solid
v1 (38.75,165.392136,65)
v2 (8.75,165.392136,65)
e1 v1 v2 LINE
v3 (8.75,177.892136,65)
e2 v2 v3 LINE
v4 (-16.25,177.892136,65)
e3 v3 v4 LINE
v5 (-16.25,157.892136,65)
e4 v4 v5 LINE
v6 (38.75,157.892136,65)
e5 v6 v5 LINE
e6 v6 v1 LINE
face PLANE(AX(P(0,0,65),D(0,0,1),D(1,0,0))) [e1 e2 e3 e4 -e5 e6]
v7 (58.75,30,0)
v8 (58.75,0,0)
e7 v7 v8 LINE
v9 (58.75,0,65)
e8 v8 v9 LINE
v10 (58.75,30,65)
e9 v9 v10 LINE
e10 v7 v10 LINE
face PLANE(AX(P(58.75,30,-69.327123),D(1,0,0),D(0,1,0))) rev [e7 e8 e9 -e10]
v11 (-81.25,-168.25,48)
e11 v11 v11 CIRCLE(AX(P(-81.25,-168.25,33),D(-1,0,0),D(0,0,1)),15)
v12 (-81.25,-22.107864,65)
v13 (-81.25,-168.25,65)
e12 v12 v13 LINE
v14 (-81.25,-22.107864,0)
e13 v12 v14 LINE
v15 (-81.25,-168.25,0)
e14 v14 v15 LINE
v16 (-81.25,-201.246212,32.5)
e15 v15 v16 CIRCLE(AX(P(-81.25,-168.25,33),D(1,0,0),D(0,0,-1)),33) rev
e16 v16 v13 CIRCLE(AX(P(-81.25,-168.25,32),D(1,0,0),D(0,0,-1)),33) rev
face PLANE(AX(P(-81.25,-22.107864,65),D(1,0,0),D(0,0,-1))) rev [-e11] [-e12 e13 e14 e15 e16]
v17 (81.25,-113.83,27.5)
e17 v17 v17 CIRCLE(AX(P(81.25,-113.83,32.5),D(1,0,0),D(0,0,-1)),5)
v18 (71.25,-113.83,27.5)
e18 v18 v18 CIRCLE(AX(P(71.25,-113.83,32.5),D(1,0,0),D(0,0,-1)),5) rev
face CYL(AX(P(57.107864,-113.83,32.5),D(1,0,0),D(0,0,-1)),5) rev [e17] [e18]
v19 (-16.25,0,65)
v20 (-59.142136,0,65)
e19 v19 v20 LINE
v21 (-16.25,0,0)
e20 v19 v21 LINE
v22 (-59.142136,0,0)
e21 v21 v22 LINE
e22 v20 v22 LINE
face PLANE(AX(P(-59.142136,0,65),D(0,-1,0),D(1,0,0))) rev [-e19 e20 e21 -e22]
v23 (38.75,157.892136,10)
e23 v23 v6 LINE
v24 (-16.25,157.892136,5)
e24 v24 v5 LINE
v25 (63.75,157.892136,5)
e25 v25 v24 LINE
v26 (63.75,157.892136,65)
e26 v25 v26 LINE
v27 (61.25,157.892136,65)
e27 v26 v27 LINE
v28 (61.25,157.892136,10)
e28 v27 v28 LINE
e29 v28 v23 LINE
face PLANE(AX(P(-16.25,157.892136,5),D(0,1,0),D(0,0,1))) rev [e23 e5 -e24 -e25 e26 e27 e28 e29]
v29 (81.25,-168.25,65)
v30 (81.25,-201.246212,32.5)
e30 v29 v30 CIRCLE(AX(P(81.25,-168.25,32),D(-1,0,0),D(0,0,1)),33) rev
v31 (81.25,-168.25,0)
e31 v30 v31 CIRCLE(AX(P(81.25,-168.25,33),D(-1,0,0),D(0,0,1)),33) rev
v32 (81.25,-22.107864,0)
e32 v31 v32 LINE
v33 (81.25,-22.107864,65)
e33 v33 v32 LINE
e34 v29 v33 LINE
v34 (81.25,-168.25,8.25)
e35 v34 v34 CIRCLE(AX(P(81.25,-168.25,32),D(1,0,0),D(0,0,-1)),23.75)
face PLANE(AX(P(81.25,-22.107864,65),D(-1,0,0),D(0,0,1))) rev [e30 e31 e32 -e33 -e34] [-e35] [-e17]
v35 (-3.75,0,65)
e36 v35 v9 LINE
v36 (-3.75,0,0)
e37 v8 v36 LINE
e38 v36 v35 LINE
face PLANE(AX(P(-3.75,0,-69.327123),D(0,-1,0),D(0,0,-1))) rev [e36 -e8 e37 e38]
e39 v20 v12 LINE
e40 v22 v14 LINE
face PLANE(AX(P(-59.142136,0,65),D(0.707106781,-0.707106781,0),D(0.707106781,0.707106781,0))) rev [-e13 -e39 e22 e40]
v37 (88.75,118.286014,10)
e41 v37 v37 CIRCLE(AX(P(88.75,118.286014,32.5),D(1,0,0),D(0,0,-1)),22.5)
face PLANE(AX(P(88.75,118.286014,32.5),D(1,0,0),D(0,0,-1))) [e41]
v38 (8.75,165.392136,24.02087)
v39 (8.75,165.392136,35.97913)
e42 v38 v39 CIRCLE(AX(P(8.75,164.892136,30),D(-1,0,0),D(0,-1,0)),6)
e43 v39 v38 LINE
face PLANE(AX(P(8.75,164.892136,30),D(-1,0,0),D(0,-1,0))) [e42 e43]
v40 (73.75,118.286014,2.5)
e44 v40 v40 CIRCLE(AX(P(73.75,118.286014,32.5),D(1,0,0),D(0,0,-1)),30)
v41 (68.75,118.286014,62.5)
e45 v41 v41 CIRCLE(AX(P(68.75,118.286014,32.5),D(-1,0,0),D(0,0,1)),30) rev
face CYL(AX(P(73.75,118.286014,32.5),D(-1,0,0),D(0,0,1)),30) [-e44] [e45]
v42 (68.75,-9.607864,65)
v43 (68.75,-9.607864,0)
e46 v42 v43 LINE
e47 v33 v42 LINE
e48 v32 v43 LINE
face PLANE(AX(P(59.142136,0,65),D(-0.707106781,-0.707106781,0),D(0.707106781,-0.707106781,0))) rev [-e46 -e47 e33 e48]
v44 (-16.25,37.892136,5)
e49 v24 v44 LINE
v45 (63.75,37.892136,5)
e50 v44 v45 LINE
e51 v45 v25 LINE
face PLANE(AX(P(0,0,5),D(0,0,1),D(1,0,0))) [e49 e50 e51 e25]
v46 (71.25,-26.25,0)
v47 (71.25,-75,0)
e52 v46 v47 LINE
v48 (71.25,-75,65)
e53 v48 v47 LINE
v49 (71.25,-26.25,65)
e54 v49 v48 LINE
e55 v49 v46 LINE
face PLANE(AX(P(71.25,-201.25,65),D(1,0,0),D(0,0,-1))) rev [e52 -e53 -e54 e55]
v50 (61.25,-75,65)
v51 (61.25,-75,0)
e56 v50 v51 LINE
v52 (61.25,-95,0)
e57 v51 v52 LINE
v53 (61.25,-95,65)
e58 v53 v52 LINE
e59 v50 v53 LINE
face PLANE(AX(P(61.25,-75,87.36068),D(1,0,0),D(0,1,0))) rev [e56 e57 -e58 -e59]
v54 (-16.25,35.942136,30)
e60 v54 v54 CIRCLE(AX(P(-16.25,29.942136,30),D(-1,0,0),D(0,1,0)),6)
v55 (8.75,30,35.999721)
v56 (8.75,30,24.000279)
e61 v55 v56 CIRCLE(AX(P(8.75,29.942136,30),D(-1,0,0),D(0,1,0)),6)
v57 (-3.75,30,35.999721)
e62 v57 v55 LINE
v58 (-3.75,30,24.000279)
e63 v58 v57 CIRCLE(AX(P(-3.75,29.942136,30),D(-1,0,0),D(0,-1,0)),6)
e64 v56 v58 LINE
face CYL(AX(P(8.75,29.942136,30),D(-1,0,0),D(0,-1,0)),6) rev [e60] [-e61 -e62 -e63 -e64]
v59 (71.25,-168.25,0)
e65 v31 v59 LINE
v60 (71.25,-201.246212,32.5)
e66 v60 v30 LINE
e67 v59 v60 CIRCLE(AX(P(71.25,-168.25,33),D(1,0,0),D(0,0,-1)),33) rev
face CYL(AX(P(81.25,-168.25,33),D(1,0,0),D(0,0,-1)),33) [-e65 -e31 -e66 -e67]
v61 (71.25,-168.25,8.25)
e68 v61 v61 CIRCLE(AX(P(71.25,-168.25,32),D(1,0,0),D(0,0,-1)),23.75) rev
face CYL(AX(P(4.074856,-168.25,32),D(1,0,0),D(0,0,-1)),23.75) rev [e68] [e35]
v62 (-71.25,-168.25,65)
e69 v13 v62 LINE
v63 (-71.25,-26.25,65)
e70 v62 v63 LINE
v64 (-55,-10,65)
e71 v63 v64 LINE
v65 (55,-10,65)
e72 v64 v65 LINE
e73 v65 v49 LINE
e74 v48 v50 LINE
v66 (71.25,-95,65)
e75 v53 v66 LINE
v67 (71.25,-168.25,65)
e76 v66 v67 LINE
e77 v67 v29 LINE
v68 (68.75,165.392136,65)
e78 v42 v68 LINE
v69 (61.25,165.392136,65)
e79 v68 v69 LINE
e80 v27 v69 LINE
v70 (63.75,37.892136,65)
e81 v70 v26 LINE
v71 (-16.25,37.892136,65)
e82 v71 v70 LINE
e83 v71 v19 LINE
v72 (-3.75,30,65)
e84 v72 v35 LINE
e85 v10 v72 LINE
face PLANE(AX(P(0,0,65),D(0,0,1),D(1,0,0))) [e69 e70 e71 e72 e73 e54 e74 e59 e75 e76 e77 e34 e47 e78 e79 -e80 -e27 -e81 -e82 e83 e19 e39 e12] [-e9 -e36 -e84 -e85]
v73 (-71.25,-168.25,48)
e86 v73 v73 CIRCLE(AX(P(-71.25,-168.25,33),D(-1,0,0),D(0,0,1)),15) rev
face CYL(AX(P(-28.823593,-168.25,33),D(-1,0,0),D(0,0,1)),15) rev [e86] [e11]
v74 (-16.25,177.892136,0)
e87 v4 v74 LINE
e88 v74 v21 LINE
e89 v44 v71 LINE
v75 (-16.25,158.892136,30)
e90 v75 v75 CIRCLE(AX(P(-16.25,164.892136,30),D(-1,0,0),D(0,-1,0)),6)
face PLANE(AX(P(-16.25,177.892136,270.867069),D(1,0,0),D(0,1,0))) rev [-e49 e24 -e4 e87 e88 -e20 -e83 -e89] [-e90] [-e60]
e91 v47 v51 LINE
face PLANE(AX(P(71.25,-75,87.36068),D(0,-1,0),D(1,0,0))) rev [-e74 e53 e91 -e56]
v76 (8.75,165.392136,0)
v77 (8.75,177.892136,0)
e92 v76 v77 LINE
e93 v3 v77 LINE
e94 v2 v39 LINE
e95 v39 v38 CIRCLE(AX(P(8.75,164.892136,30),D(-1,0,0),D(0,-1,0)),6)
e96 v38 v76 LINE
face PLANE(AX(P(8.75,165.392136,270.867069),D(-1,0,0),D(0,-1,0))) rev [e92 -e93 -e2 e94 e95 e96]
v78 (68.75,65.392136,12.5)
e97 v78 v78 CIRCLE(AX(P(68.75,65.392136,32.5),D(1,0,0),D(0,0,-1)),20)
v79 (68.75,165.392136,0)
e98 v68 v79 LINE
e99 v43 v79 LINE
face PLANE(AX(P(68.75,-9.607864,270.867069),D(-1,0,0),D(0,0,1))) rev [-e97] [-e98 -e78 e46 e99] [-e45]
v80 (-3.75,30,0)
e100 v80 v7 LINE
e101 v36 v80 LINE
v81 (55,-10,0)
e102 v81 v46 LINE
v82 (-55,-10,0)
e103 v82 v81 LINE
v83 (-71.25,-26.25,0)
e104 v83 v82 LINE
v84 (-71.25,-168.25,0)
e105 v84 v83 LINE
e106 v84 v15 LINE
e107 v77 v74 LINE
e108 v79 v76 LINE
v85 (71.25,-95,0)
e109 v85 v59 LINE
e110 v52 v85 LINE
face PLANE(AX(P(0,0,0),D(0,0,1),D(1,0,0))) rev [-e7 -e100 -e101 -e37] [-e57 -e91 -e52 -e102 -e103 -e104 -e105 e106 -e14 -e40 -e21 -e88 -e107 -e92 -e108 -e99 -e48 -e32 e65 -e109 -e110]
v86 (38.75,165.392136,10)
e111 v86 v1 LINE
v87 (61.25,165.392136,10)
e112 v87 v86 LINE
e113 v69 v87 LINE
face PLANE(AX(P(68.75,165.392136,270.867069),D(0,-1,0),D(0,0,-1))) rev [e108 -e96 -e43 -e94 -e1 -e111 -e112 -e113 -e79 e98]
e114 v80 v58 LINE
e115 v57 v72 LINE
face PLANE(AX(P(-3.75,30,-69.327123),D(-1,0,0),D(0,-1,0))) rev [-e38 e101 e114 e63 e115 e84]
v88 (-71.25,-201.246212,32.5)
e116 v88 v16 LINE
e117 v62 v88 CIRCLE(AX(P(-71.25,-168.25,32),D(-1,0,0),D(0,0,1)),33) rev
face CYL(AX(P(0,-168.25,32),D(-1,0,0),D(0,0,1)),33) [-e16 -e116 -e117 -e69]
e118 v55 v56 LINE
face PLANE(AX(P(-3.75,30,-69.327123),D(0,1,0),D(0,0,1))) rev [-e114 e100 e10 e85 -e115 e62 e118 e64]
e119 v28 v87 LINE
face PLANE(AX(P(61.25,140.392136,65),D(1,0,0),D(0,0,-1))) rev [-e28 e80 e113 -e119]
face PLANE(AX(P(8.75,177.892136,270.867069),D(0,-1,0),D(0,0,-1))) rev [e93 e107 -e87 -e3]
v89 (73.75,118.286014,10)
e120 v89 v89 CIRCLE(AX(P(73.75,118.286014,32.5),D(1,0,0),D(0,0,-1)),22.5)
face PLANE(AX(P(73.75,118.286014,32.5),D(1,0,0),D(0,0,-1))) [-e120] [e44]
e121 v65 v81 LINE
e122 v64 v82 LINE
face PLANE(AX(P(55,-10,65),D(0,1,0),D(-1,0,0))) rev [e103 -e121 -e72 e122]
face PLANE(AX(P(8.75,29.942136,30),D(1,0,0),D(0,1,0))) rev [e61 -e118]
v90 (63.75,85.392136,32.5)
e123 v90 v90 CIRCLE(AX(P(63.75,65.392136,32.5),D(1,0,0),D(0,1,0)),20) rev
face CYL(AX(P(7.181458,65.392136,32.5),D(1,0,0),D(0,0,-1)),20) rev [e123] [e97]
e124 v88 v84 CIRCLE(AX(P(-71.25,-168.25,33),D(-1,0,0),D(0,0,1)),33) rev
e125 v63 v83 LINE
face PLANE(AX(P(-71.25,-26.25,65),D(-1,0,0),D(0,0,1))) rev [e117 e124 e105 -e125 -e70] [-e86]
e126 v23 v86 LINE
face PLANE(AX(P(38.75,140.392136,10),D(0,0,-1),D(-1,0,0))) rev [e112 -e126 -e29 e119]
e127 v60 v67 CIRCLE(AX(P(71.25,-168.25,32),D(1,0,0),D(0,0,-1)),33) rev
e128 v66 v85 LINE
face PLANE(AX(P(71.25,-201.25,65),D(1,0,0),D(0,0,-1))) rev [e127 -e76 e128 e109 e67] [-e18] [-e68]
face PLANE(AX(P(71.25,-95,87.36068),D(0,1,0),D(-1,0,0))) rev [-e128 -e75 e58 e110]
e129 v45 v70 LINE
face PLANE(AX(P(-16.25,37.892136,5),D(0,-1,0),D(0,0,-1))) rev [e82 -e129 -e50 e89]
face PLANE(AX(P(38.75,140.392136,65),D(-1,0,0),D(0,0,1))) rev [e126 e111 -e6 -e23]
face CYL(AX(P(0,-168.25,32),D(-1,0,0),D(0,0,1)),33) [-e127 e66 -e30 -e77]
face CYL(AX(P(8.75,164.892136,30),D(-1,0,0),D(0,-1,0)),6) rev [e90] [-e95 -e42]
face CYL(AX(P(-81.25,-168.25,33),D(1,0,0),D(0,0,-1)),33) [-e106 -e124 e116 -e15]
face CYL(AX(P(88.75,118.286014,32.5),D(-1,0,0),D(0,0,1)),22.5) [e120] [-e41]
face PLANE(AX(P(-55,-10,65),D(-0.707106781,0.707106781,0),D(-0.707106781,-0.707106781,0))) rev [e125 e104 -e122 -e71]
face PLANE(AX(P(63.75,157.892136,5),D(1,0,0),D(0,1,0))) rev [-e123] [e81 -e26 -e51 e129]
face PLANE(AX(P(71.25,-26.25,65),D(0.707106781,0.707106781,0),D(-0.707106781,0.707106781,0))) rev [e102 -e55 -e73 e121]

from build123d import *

# Parameters (mm, degrees)
BOSS_EXTRUDE1_DEPTH = 65
BOSS_EXTRUDE2_DEPTH = 65
SKETCH3_W           = 62.5
SKETCH3_H           = 30
CUT_EXTRUDE1_DEPTH  = 65
SKETCH5_W           = 80
SKETCH5_H           = 120
CUT_EXTRUDE2_DEPTH  = 60
SKETCH6_R           = 6
CUT_EXTRUDE3_DEPTH  = 25
FILLET1_R           = 33
SKETCH7_R           = 15
CUT_EXTRUDE4_DEPTH  = 10
SKETCH8_R           = 23.75
CUT_EXTRUDE5_DEPTH  = 10
SKETCH10_W          = 22.5
SKETCH10_H          = 55
CUT_EXTRUDE7_DEPTH  = 25
SKETCH11_R          = 20
CUT_EXTRUDE8_DEPTH  = 5
SKETCH12_R          = 30
BOSS_EXTRUDE3_DEPTH = 5
SKETCH13_R          = 22.5
BOSS_EXTRUDE4_DEPTH = 15
SKETCH14_W          = 10
SKETCH14_H          = 20
BOSS_EXTRUDE5_DEPTH = 65
SKETCH15_R          = 5
CUT_EXTRUDE9_DEPTH  = 10


with BuildPart() as part:
    # Sketch1 → Boss-Extrude1 (new body)
    with BuildSketch(Plane.XY):
        Polygon((-59.142135624, 0), (59.142135624, 0), (81.25, -22.107864376), (81.25, -201.25), (71.25, -201.25), (71.25, -26.25), (55, -10), (-55, -10), (-71.25, -26.25), (-71.25, -201.25), (-81.25, -201.25), (-81.25, -22.107864376), align=None)
    extrude(amount=BOSS_EXTRUDE1_DEPTH)

    # Sketch2 → Boss-Extrude2 (add)
    with BuildSketch(Plane.XY):
        Polygon((68.75, -9.607864376), (68.75, 165.392135624), (8.75, 165.392135624), (8.75, 177.892135624), (-16.25, 177.892135624), (-16.25, 0), (59.142135624, 0), align=None)
    extrude(amount=BOSS_EXTRUDE2_DEPTH)

    # Sketch3 → Cut-Extrude1 (cut)
    with BuildSketch(Plane.XY.offset(65)):
        with Locations((27.5, 15)):
            Rectangle(SKETCH3_W, SKETCH3_H)
    extrude(amount=-CUT_EXTRUDE1_DEPTH, mode=Mode.SUBTRACT)

    # Sketch5 → Cut-Extrude2 (cut)
    with BuildSketch(Plane.XY.offset(65)):
        with Locations((23.75, 97.892135624)):
            Rectangle(SKETCH5_W, SKETCH5_H)
    extrude(amount=-CUT_EXTRUDE2_DEPTH, mode=Mode.SUBTRACT)

    # Sketch6 → Cut-Extrude3 (cut)
    with BuildSketch(Plane.ZY.offset(16.25)):
        with Locations(Location((30, 164.892135624, 0), (0, 0, 270))):
            Circle(SKETCH6_R)
        with Locations(Location((30, 29.942135624, 0), (0, 0, 179.447427343))):
            Circle(SKETCH6_R)
    extrude(amount=-CUT_EXTRUDE3_DEPTH, mode=Mode.SUBTRACT)

    # Fillet1
    # the kernel refuses this fillet: 33 mm, written as the material it takes off along each edge
    with BuildSketch(Plane(origin=(163.75, -201.25, 65), x_dir=(0, 1, 0), z_dir=(-1, 0, 0)), Plane(origin=(11.25, -201.25, 65), x_dir=(0, 1, 0), z_dir=(-1, 0, 0))) as fillet1_piece_1:
        with BuildLine():
            CenterArc((FILLET1_R, FILLET1_R), FILLET1_R, 180, 90)
            Line((0, FILLET1_R), (0, 0))
            Line((0, 0), (FILLET1_R, 0))
        make_face()
    extrude(amount=175, mode=Mode.SUBTRACT)
    with BuildSketch(Plane(origin=(163.75, -201.25, 0), x_dir=(0, 1, 0), z_dir=(-1, 0, 0)), Plane(origin=(11.25, -201.25, 0), x_dir=(0, 1, 0), z_dir=(-1, 0, 0))) as fillet1_piece_2:
        with BuildLine():
            CenterArc((FILLET1_R, -FILLET1_R), FILLET1_R, 90, 90)
            Line((0, -FILLET1_R), (0, 0))
            Line((0, 0), (FILLET1_R, 0))
        make_face()
    extrude(amount=175, mode=Mode.SUBTRACT)

    # Sketch7 → Cut-Extrude4 (cut)
    with BuildSketch(Plane.ZY.offset(81.25)):
        with Locations((33, -168.25)):
            Circle(SKETCH7_R)
    extrude(amount=-CUT_EXTRUDE4_DEPTH, mode=Mode.SUBTRACT)

    # Sketch8 → Cut-Extrude5 (cut)
    with BuildSketch(Plane(origin=(81.25, 0, 0), x_dir=(0, 0, -1), z_dir=(1, 0, 0))):
        with Locations((-32, -168.25)):
            Circle(SKETCH8_R)
    extrude(amount=-CUT_EXTRUDE5_DEPTH, mode=Mode.SUBTRACT)

    # Sketch10 → Cut-Extrude7 (cut)
    with BuildSketch(Plane(origin=(0, 165.392135624, 0), x_dir=(1, 0, 0), z_dir=(0, 1, 0))):
        with Locations((50, -37.5)):
            Rectangle(SKETCH10_W, SKETCH10_H)
    extrude(amount=-CUT_EXTRUDE7_DEPTH, mode=Mode.SUBTRACT)

    # Sketch11 → Cut-Extrude8 (cut)
    with BuildSketch(Plane(origin=(68.75, 0, 0), x_dir=(0, 0, -1), z_dir=(1, 0, 0))):
        with Locations((-32.5, 65.392135624)):
            Circle(SKETCH11_R)
    extrude(amount=-CUT_EXTRUDE8_DEPTH, mode=Mode.SUBTRACT)

    # Sketch12 → Boss-Extrude3 (add)
    with BuildSketch(Plane(origin=(68.75, 0, 0), x_dir=(0, 0, -1), z_dir=(1, 0, 0))):
        with Locations(Location((-32.5, 118.286013704, 0), (0, 0, 180))):
            Circle(SKETCH12_R)
    extrude(amount=BOSS_EXTRUDE3_DEPTH)

    # Sketch13 → Boss-Extrude4 (add)
    with BuildSketch(Plane(origin=(73.75, 0, 0), x_dir=(0, 0, -1), z_dir=(1, 0, 0))):
        with Locations((-32.5, 118.286013704)):
            Circle(SKETCH13_R)
    extrude(amount=BOSS_EXTRUDE4_DEPTH)

    # Sketch14 → Boss-Extrude5 (add)
    with BuildSketch(Plane.XY):
        with Locations((66.25, -85)):
            Rectangle(SKETCH14_W, SKETCH14_H)
    extrude(amount=BOSS_EXTRUDE5_DEPTH)

    # Sketch15 → Cut-Extrude9 (cut)
    with BuildSketch(Plane(origin=(81.25, 0, 0), x_dir=(0, 0, -1), z_dir=(1, 0, 0))):
        with Locations((-32.5, -113.83)):
            Circle(SKETCH15_R)
    extrude(amount=-CUT_EXTRUDE9_DEPTH, mode=Mode.SUBTRACT)


solid = part.part
